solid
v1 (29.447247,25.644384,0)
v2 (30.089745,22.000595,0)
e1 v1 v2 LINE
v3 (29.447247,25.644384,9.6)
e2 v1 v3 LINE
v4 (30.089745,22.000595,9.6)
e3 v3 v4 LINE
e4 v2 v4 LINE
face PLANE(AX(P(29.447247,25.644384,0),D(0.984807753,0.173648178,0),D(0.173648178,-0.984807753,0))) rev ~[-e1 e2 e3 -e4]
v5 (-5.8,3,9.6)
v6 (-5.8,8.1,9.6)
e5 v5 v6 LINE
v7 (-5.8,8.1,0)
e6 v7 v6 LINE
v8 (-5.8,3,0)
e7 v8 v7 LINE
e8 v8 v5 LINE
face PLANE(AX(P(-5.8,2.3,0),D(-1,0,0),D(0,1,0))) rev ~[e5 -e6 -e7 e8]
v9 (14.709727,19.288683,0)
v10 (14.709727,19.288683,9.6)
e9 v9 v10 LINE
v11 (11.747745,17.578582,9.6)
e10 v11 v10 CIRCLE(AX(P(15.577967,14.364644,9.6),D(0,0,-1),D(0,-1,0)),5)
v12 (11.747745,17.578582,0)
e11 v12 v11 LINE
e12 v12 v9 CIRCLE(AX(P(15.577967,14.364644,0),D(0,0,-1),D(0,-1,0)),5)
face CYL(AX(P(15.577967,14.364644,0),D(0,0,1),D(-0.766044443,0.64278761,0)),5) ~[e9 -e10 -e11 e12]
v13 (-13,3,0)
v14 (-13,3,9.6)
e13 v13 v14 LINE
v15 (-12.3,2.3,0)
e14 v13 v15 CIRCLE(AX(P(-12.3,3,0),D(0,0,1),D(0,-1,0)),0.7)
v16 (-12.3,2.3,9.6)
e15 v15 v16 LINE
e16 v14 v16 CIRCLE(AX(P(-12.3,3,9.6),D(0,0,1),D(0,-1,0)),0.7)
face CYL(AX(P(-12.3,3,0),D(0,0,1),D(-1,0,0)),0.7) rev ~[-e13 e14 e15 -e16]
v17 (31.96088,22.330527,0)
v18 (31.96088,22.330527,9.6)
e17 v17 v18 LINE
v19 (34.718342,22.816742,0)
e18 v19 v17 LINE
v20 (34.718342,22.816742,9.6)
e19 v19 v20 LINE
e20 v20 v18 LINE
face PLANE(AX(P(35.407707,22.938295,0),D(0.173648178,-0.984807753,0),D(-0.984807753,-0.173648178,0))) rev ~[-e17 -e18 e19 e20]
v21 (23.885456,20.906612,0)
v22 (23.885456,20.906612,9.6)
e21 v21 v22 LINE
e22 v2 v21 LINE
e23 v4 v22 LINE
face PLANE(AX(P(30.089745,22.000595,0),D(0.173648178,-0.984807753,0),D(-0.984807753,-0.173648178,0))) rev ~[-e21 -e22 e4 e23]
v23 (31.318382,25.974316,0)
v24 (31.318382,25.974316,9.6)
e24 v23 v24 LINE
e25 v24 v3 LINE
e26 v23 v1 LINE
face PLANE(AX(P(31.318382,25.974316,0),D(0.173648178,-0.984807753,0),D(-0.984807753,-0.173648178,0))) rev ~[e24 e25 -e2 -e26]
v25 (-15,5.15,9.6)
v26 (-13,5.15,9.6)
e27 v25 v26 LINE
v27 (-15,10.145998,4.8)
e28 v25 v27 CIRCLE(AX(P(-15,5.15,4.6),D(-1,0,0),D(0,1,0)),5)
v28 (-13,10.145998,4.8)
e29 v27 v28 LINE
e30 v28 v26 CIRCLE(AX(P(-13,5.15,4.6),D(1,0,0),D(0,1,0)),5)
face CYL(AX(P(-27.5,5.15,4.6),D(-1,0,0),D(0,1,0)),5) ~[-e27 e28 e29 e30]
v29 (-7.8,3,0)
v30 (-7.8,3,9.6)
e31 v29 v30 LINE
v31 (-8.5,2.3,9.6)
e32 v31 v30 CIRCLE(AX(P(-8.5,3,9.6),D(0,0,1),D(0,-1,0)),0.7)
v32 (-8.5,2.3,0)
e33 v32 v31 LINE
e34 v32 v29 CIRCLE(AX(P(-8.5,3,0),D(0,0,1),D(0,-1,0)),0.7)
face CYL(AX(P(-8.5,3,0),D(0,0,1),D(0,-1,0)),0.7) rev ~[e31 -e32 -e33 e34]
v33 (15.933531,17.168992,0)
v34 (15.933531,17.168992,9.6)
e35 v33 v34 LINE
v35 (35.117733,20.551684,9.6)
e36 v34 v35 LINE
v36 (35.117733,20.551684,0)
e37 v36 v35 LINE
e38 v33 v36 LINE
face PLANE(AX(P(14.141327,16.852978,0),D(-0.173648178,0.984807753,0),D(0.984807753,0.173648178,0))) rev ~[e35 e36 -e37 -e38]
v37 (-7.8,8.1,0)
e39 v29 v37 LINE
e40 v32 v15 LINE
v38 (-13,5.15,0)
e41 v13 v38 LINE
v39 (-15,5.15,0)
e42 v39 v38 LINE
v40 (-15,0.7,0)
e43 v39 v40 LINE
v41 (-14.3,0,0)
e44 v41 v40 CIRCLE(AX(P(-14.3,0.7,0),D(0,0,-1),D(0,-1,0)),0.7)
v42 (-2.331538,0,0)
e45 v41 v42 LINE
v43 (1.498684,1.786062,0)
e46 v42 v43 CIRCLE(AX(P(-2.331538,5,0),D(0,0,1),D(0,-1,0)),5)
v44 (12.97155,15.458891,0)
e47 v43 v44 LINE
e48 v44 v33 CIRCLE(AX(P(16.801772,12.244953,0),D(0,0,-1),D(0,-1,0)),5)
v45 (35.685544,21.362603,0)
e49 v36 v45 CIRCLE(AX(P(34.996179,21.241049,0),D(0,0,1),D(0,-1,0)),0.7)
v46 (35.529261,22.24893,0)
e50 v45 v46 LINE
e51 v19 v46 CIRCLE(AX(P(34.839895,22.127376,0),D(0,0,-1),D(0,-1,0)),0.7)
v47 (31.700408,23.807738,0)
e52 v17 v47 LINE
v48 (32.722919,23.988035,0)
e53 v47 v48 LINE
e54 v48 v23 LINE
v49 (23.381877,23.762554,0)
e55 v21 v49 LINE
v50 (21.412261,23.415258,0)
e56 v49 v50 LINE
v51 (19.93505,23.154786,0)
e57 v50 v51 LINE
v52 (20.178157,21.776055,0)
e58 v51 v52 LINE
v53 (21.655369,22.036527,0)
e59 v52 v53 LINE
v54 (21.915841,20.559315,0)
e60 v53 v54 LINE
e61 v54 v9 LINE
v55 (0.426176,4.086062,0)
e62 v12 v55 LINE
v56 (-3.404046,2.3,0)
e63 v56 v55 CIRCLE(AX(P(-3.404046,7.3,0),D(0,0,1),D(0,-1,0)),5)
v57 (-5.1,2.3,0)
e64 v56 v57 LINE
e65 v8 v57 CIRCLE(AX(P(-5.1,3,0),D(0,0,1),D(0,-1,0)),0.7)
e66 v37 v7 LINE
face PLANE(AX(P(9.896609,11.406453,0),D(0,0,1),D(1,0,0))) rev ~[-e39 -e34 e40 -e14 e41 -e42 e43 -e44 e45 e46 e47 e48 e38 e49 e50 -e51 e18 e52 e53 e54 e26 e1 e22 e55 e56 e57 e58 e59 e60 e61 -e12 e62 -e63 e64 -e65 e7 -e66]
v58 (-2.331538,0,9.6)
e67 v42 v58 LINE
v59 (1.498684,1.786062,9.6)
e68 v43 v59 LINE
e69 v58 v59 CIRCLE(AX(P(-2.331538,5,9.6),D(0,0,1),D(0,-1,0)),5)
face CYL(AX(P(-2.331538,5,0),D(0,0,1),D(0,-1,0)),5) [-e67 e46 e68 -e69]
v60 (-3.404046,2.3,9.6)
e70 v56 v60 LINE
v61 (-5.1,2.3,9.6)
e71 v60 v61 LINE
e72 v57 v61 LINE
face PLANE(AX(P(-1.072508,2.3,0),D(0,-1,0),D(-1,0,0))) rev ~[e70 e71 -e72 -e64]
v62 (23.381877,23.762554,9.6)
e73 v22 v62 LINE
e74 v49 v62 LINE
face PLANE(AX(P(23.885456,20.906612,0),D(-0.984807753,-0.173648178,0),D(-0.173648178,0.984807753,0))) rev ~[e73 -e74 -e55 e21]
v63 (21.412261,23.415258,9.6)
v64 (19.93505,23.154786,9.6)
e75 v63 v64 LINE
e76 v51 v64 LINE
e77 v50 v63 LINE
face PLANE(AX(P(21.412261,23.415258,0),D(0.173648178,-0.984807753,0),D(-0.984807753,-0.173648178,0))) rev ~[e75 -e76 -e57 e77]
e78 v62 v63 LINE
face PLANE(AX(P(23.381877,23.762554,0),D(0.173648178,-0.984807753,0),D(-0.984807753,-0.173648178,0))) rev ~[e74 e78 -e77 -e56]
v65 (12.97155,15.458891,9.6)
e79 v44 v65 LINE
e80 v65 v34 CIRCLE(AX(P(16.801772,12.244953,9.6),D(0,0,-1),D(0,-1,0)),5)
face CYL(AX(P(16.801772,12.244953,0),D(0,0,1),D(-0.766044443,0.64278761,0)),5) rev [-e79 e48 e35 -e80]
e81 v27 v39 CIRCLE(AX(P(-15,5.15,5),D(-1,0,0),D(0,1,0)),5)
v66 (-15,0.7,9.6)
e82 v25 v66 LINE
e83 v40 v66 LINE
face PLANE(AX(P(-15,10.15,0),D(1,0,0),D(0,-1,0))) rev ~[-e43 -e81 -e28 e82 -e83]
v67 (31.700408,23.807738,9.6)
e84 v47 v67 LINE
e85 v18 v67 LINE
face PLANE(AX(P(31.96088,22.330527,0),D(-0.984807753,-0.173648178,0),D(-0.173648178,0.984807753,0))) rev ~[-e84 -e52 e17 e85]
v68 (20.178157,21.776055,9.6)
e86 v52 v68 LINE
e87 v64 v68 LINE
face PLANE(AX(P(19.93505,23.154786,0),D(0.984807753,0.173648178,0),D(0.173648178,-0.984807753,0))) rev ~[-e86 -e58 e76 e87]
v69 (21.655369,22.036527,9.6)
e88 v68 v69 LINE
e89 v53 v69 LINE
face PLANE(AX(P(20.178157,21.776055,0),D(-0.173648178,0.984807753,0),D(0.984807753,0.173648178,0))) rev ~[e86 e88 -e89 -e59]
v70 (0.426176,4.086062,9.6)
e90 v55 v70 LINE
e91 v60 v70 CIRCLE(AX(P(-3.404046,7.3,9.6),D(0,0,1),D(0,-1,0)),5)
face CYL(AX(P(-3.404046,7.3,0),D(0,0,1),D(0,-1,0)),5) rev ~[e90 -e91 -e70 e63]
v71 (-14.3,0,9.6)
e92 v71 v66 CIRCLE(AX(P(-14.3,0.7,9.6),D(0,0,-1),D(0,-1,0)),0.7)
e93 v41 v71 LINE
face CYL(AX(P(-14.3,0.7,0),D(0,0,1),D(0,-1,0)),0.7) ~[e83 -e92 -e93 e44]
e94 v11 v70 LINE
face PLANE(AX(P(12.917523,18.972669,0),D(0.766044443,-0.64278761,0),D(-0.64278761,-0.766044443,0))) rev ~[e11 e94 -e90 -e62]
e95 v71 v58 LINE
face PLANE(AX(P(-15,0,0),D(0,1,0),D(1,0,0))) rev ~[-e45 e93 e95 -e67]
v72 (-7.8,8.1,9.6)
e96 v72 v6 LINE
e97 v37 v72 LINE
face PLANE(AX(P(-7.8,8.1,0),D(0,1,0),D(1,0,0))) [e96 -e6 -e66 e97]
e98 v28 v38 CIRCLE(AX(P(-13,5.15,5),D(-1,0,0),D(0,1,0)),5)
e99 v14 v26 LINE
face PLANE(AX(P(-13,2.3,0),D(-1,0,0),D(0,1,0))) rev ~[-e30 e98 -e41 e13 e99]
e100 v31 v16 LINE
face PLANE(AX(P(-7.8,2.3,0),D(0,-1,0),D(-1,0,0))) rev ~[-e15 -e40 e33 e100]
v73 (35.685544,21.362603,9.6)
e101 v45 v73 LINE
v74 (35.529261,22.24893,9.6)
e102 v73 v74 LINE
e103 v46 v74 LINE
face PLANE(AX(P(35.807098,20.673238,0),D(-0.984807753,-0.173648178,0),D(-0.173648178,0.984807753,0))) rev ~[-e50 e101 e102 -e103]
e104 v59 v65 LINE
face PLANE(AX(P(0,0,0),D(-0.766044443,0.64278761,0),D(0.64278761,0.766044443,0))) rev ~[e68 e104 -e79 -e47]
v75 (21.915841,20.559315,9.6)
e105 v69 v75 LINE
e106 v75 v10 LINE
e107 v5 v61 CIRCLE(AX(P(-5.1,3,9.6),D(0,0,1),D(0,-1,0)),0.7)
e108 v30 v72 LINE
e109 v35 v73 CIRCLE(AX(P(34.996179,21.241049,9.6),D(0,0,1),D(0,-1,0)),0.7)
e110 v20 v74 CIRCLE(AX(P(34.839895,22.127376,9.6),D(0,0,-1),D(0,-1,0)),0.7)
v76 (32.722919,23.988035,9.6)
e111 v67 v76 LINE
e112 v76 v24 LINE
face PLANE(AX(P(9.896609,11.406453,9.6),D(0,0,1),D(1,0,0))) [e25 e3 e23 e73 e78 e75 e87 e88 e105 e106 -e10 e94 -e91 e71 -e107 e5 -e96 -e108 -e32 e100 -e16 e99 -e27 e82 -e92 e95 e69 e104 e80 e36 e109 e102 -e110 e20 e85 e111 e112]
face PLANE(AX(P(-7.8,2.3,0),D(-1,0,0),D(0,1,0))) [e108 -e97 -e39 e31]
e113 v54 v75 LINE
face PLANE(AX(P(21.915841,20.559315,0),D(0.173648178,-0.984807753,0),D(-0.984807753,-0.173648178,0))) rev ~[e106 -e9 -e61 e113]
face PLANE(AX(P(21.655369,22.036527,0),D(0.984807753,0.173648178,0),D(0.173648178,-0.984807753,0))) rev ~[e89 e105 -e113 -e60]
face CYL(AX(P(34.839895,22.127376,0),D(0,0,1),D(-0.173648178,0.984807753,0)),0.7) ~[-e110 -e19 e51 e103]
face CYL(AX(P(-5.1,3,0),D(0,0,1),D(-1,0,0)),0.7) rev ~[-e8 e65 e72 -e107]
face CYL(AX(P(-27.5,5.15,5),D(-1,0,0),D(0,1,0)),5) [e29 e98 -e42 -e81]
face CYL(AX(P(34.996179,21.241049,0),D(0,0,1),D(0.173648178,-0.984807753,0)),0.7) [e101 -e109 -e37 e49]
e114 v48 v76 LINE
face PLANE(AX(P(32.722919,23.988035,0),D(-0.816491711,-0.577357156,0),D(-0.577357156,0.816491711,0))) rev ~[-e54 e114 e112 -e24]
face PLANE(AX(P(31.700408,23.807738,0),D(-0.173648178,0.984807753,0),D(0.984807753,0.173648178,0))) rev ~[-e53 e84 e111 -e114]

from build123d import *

# Parameters (mm, degrees)
F0_W        = 2
F0_H        = 7.85
F0_H_2      = 5.8
F1_DEPTH    = 9.6
F2_T1_DEPTH = 14.5
F3_R        = 0.7
F4_R        = 5


# Not quite as in the source:
# - a fillet or chamfer that OpenCascade refuses, or shapes differently, is made with other operations: its cross-section is extruded or revolved along the edge and cut away or added


with BuildPart() as f1:
    # F0 (on Top) → F1 (new body)
    with BuildSketch(Plane.XY):
        Polygon((-15, 0), (0, 0), (14.1413274131, 16.8529777486), (35.8070979794, 20.6732376573), (35.4077071707, 22.9382954892), (31.9608800352, 22.3305268674), (30.0897453045, 22.0005953298), (23.8854564605, 20.9066118105), (21.9158409545, 20.5593154552), (12.9175229748, 18.9726692144), (-1.0725076138, 2.3), (-5.8, 2.3), (-7.8, 2.3), (-13, 2.3), (-15, 2.3), align=None)
        with Locations((-14, 6.225)):
            Rectangle(F0_W, F0_H)
        with Locations((-6.8, 5.2)):
            Rectangle(F0_W, F0_H_2)
        Polygon((30.0897453045, 22.0005953298), (31.9608800352, 22.3305268674), (31.7004077687, 23.8077384969), (31.3183817778, 25.9743155535), (29.4472470471, 25.644384016), align=None)
        Polygon((31.3183817778, 25.9743155535), (31.7004077687, 23.8077384969), (32.7229194348, 23.9880348917), align=None)
        Polygon((21.9158409545, 20.5593154552), (23.8854564605, 20.9066118105), (23.3818767453, 23.7625542943), (21.4122612392, 23.4152579389), (21.655368688, 22.0365270847), align=None)
        Polygon((20.1781570585, 21.7760548182), (21.655368688, 22.0365270847), (21.4122612392, 23.4152579389), (19.9350496097, 23.1547856724), align=None)
    extrude(amount=F1_DEPTH)

    # F2: fillet of radius 5 on 2 edges, made by hand

    # F2_s2 → F2_t1 (cut)
    with BuildSketch(Plane.YZ.offset(-27.5)):
        with BuildLine():
            ThreePointArc((10.15, 4.6), (8.6855339059, 8.1355339059), (5.15, 9.6))
            Line((5.15, 9.6), (10.15, 9.6))
            Line((10.15, 9.6), (10.15, 4.6))
        make_face()
        with BuildLine():
            ThreePointArc((10.15, 5), (8.6855339059, 1.4644660941), (5.15, 0))
            Line((5.15, 0), (10.15, 0))
            Line((10.15, 0), (10.15, 5))
        make_face()
    extrude(amount=F2_T1_DEPTH, mode=Mode.SUBTRACT)

    # F3
    f3_edges = [f1.edges().sort_by_distance(p)[0] for p in [
        (-13, 2.3, 4.8),
        (-7.8, 2.3, 4.8),
        (-5.8, 2.3, 4.8),
        (-15, 0, 4.8),
        (35.407707, 22.938295, 4.8),
        (35.807098, 20.673238, 4.8),
    ]]
    fillet(f3_edges, radius=F3_R)

    # F4
    f4_edges = [f1.edges().sort_by_distance(p)[0] for p in [
        (0, 0, 4.8),
        (12.917523, 18.972669, 4.8),
        (14.141327, 16.852978, 4.8),
        (-1.072508, 2.3, 4.8),
    ]]
    fillet(f4_edges, radius=F4_R)


solid = f1.part
